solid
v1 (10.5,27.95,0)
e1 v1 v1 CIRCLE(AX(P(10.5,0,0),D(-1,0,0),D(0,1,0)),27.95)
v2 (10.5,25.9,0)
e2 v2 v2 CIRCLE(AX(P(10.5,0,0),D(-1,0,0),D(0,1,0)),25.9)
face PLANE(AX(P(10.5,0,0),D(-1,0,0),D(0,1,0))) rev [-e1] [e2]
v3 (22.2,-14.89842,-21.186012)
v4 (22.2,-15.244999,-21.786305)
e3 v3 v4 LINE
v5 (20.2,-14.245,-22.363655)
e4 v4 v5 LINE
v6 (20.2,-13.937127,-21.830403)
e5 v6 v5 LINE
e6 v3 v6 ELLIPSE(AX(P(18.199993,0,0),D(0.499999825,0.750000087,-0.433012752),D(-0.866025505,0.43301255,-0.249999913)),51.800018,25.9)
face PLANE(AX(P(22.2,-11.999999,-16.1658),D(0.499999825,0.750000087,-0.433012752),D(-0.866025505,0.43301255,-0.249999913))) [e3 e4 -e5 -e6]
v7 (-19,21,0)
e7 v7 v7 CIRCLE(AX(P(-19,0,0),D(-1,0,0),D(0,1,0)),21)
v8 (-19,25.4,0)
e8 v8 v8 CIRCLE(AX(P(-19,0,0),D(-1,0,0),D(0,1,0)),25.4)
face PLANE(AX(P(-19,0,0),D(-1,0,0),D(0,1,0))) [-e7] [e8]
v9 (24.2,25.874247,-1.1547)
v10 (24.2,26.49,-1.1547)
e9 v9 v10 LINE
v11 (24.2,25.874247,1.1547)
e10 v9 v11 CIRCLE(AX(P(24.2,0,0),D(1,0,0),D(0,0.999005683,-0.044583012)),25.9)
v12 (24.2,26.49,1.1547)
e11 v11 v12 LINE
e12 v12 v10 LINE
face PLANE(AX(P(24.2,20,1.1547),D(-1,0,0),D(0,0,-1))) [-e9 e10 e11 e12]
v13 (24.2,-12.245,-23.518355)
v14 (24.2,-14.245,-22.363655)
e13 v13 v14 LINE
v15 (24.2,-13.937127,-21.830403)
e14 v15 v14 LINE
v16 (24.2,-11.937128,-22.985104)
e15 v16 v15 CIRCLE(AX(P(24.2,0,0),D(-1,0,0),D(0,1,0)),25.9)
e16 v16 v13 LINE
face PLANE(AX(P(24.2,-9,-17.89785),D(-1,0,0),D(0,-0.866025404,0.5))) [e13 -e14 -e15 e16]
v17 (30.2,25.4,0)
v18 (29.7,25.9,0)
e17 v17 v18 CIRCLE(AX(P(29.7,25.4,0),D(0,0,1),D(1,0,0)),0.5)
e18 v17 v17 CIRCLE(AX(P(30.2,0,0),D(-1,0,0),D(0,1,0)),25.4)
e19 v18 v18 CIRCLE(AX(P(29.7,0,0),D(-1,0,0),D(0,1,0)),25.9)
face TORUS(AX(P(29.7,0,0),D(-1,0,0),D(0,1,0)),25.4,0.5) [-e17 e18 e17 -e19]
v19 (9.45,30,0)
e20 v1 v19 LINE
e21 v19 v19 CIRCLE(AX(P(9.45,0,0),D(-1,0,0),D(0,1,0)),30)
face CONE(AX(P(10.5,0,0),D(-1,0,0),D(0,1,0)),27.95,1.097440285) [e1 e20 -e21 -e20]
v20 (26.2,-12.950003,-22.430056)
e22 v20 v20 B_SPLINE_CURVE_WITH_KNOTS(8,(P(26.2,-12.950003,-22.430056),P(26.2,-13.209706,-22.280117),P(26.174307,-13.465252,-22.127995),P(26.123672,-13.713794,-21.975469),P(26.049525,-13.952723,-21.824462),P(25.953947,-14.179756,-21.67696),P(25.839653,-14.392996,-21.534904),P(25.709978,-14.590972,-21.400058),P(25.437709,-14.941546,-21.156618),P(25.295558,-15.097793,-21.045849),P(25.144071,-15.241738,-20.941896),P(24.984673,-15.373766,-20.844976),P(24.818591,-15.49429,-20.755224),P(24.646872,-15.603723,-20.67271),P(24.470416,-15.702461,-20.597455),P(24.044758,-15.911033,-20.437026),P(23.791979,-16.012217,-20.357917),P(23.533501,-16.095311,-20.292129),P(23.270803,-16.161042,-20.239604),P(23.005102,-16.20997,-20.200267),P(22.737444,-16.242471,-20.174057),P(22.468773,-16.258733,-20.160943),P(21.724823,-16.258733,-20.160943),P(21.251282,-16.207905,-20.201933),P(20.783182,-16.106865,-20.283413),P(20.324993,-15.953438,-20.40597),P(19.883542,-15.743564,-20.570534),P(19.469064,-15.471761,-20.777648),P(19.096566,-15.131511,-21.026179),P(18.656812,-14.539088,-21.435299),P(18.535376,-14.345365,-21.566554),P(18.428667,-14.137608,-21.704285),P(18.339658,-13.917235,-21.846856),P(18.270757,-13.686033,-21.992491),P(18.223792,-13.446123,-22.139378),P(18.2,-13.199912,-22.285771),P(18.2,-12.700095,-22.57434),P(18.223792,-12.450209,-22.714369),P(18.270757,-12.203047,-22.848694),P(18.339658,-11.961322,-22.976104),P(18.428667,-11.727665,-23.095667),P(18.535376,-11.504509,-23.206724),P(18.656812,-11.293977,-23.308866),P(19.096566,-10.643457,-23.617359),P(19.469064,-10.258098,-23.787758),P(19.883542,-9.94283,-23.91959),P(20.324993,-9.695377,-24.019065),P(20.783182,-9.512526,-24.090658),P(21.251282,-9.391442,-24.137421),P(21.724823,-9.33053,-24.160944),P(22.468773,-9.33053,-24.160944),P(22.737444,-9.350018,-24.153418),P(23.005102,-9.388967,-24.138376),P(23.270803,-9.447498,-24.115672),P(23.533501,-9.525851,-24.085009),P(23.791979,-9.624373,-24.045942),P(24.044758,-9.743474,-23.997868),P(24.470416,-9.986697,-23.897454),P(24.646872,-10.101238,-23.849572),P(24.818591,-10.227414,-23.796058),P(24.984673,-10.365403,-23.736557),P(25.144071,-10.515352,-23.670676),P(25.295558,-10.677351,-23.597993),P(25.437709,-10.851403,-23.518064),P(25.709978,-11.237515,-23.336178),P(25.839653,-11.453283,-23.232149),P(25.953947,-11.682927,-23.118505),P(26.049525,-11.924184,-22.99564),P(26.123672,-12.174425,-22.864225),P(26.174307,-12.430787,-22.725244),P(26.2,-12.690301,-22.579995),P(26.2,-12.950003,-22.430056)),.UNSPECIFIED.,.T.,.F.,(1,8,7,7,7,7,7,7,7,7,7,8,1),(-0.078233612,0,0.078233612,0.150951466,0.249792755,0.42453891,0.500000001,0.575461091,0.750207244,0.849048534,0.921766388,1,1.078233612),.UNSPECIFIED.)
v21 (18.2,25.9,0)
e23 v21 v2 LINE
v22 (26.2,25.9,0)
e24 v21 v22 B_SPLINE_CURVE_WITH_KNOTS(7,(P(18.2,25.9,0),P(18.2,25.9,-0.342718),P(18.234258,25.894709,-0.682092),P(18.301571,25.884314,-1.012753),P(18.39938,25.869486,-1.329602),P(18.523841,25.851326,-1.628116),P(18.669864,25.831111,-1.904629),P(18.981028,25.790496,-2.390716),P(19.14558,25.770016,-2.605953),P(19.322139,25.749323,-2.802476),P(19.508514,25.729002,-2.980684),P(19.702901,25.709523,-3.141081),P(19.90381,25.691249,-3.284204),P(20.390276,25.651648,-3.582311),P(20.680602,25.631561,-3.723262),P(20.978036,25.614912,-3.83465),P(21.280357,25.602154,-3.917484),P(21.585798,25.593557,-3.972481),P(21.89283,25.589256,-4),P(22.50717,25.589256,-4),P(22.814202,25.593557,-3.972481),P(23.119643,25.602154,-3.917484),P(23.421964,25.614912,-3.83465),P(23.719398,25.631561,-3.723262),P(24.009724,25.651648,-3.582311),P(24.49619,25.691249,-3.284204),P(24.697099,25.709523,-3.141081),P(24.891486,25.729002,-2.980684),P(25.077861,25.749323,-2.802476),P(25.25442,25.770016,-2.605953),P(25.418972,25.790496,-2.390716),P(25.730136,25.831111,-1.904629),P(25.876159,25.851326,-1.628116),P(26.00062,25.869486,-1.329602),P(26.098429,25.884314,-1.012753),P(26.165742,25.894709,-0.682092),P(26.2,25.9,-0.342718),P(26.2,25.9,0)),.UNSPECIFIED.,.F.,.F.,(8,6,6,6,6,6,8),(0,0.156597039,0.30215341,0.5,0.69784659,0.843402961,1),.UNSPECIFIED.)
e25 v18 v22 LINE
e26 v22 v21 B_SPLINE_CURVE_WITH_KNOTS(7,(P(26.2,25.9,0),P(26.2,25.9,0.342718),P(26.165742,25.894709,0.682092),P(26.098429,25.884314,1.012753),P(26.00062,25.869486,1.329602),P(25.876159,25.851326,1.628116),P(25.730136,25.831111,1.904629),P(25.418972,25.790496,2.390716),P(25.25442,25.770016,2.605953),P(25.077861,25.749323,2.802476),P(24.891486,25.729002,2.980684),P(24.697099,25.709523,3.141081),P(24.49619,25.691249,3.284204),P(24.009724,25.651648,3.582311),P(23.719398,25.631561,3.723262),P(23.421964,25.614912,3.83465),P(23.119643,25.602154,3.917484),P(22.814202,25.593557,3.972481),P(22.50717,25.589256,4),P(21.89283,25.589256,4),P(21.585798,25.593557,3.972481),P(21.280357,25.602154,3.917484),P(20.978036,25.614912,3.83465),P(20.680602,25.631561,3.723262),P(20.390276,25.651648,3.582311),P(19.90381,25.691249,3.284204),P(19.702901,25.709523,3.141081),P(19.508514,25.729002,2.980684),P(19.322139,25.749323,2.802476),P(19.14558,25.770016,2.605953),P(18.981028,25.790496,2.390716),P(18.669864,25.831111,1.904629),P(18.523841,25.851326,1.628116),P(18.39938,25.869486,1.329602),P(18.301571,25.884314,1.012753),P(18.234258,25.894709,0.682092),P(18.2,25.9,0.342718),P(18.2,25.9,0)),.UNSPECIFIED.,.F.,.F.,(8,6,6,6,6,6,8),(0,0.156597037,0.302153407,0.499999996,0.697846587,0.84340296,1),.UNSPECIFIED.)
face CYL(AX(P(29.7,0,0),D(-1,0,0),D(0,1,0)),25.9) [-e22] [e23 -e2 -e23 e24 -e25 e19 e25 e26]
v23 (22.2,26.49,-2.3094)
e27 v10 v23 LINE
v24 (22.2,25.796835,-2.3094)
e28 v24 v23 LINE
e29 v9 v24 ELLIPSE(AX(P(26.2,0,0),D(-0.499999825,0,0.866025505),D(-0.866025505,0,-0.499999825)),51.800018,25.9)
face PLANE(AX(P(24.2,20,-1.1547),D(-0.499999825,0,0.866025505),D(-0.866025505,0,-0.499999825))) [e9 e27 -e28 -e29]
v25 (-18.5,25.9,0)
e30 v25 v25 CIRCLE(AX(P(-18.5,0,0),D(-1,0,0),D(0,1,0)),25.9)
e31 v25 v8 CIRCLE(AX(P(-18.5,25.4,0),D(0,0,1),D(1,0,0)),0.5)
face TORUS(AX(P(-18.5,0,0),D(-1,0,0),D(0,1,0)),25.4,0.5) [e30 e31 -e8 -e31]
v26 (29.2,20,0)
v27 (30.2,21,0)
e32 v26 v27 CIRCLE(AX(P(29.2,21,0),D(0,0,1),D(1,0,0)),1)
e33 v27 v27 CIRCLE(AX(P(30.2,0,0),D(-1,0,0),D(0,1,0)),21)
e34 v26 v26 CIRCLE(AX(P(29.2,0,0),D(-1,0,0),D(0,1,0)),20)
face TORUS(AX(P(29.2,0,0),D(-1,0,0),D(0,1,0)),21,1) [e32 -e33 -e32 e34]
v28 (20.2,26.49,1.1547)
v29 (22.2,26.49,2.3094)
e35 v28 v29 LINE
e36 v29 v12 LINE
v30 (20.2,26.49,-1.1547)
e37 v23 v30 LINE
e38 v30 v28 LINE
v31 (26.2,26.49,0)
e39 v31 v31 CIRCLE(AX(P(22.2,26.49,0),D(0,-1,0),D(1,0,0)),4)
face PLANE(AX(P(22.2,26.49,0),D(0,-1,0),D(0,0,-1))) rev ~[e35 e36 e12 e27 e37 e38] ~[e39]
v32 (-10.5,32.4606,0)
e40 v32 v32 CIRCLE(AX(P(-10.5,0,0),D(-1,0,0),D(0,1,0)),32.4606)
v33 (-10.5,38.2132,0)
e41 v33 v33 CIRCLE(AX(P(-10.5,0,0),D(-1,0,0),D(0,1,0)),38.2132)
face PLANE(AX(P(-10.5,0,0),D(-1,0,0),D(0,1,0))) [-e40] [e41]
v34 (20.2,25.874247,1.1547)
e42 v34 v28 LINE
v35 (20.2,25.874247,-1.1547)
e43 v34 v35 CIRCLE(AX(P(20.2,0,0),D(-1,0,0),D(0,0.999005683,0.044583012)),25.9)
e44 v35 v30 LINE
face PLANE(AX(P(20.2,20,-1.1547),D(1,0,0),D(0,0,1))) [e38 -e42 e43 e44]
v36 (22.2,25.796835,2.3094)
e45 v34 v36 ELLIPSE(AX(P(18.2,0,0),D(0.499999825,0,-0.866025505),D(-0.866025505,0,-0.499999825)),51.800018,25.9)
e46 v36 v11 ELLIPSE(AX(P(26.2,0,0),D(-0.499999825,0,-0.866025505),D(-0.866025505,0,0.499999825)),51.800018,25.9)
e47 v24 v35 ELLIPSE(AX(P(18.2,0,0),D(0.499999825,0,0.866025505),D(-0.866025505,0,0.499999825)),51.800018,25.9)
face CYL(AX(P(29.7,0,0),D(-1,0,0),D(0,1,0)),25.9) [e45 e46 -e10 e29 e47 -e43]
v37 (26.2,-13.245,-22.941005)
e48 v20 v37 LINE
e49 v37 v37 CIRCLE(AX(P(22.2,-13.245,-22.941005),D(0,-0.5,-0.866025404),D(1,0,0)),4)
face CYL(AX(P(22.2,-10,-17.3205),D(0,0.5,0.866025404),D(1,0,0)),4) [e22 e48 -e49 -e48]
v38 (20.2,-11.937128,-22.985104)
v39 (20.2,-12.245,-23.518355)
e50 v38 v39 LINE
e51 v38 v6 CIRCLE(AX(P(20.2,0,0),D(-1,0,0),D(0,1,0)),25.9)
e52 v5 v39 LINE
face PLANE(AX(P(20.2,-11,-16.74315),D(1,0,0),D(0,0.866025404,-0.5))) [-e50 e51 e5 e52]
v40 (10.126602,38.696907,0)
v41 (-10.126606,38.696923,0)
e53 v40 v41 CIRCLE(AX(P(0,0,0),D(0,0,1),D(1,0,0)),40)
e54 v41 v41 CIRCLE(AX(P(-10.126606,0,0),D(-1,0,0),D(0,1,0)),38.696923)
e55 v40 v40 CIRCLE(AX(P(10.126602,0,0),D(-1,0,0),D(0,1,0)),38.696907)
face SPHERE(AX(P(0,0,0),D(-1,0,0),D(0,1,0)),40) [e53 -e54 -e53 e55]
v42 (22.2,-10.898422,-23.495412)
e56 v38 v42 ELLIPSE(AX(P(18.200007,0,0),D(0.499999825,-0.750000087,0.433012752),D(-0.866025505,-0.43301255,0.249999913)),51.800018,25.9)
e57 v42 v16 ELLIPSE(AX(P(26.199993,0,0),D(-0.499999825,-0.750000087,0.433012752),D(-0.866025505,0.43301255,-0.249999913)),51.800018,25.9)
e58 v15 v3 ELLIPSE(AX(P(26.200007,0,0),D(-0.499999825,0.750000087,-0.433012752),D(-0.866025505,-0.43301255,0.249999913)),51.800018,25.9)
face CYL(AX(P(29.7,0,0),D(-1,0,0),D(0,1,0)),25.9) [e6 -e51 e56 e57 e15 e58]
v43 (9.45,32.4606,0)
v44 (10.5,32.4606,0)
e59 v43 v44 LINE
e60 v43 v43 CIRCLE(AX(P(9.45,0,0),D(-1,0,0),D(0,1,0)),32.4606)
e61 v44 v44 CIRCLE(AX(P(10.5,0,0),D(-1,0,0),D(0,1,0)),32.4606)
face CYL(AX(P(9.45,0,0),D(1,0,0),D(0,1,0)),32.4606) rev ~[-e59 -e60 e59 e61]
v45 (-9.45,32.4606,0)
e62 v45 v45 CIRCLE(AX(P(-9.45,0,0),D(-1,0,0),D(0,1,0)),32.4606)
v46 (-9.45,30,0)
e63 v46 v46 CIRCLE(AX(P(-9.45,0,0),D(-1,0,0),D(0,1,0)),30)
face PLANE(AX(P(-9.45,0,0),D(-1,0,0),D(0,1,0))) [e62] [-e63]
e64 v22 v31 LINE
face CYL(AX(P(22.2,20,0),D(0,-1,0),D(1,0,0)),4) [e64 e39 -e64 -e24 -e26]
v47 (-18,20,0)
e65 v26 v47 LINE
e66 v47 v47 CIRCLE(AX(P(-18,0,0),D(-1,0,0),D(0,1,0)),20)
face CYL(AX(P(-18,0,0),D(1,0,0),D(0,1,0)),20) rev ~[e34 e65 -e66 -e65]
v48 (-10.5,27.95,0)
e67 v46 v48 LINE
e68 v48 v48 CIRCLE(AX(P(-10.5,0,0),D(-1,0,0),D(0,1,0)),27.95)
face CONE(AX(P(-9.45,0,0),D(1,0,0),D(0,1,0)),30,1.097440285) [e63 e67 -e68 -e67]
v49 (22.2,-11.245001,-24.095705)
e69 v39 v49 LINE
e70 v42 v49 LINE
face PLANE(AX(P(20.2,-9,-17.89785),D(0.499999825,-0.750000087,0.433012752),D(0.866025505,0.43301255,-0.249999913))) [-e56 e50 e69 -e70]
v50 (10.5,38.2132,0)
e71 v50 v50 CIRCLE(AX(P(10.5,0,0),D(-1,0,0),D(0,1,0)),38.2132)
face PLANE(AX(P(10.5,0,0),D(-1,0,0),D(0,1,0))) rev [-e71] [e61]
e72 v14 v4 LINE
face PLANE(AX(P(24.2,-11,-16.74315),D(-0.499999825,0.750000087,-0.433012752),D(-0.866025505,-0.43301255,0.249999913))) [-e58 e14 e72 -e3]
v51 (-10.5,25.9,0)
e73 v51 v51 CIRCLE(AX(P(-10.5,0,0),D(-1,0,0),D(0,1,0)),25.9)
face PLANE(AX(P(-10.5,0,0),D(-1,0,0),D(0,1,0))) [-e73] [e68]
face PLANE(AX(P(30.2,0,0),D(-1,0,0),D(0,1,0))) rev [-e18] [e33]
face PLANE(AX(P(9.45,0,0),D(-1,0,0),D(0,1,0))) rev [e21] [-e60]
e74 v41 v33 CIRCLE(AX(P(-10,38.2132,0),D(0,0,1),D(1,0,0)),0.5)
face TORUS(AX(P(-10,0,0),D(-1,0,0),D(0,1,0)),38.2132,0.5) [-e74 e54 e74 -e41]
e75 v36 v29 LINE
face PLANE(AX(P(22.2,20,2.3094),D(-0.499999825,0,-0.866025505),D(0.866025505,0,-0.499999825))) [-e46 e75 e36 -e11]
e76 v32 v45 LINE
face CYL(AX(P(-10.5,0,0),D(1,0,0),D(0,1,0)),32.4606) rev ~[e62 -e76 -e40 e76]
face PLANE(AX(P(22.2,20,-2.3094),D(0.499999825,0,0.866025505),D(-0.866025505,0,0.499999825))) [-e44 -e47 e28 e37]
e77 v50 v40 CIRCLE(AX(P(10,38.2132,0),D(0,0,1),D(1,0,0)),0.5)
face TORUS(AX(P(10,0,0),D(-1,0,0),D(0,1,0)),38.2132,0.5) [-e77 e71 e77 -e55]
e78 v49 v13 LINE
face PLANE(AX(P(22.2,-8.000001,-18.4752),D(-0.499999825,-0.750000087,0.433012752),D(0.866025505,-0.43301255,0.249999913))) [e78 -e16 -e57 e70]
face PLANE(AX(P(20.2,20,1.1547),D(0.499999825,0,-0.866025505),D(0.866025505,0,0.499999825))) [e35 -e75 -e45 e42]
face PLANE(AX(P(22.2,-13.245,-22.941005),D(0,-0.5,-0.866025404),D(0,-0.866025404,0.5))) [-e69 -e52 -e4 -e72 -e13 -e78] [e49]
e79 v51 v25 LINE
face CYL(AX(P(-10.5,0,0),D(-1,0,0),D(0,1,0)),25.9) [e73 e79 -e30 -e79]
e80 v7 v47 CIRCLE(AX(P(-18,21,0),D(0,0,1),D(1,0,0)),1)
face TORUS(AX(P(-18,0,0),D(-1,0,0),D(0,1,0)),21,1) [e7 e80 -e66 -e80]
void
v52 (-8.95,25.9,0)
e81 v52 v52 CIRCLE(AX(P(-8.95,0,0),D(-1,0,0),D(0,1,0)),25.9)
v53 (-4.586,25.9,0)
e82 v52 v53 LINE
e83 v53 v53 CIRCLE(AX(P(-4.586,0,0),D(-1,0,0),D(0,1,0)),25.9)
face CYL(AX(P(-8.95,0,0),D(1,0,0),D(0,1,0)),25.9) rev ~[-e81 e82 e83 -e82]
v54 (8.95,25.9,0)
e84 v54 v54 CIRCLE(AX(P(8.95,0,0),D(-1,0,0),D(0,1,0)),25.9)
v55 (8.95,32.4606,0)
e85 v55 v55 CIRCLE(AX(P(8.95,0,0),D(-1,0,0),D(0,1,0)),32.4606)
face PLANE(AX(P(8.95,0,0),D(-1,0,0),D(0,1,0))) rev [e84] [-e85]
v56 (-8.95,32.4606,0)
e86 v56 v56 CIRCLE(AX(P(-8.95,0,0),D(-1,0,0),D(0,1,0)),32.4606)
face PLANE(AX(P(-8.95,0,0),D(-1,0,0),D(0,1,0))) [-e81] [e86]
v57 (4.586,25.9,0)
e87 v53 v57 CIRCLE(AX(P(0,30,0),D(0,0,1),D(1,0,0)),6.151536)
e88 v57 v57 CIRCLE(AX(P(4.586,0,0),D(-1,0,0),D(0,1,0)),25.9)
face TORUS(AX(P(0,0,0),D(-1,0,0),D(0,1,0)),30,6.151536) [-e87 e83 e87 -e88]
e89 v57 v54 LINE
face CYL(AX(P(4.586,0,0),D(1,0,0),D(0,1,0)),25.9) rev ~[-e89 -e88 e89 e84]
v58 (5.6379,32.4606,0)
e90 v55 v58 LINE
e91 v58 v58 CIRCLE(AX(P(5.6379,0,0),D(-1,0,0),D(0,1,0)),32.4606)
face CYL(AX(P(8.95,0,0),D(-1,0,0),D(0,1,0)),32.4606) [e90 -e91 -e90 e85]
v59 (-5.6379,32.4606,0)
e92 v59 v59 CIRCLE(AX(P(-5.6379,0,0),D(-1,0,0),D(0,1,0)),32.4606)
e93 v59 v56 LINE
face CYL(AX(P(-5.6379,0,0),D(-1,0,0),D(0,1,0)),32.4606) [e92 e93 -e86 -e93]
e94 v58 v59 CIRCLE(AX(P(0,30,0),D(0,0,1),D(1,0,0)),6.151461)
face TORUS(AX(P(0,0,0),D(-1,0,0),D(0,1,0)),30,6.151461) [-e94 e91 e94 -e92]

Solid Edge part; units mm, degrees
sketch "Sketch1" plane through (0, 20, 0) normal (0, -1, 0) x (1, 0, 0)
  circle A0 centre (22.2, 0) radius 4
  line L0 (20.2, -1.1547) -> (20.2, 1.1547)
  line L1 (20.2, 1.1547) -> (22.2, 2.3094)
  line L2 (22.2, 2.3094) -> (24.2, 1.1547)
  line L3 (24.2, 1.1547) -> (24.2, -1.1547)
  line L4 (24.2, -1.1547) -> (22.2, -2.3094)
  line L5 (22.2, -2.3094) -> (20.2, -1.1547)
extrude "ExtrudedProtrusion_1" add sketch "Sketch1" against normal blind 6.49
sketch "Sketch2" plane through (0, 0, 0) normal (0, 0, 1) x (1, 0, 0)
  arc A0 (-19, 21) -> (-18, 20) centre (-18, 21) ccw
  line L0 (-18, 20) -> (29.2, 20)
  arc A1 (29.2, 20) -> (30.2, 21) centre (29.2, 21) ccw
  line L1 (30.2, 21) -> (30.2, 25.4)
  arc A2 (30.2, 25.4) -> (29.7, 25.9) centre (29.7, 25.4) ccw
  line L2 (29.7, 25.9) -> (10.5, 25.9)
  line L3 (10.5, 25.9) -> (10.5, 27.95)
  line L4 (10.5, 27.95) -> (9.45, 30)
  line L5 (9.45, 30) -> (9.45, 32.4606)
  line L6 (9.45, 32.4606) -> (10.5, 32.4606)
  line L7 (10.5, 32.4606) -> (10.5, 38.2132)
  arc A3 (10.5, 38.2132) -> (10.1266, 38.6969) centre (10, 38.2132) ccw
  arc A4 (10.1266, 38.6969) -> (-10.1266, 38.6969) centre (0, 0) ccw
  arc A5 (-10.1266, 38.6969) -> (-10.5, 38.2132) centre (-10, 38.2132) ccw
  line L8 (-10.5, 38.2132) -> (-10.5, 32.4606)
  line L9 (-10.5, 32.4606) -> (-9.45, 32.4606)
  line L10 (-9.45, 32.4606) -> (-9.45, 30)
  line L11 (-9.45, 30) -> (-10.5, 27.95)
  line L12 (-10.5, 27.95) -> (-10.5, 25.9)
  line L13 (-10.5, 25.9) -> (-18.5, 25.9)
  arc A6 (-18.5, 25.9) -> (-19, 25.4) centre (-18.5, 25.4) ccw
  line L14 (-19, 25.4) -> (-19, 21)
  line L15 (-8.95, 32.4606) -> (-8.95, 25.9)
  line L16 (-8.95, 25.9) -> (-4.586, 25.9)
  arc A7 (-4.586, 25.9) -> (4.586, 25.9) centre (0, 30) ccw
  line L17 (4.586, 25.9) -> (8.95, 25.9)
  line L18 (8.95, 25.9) -> (8.95, 32.4606)
  line L19 (8.95, 32.4606) -> (5.6379, 32.4606)
  arc A8 (5.6379, 32.4606) -> (-5.6379, 32.4606) centre (0, 30) ccw
  line L20 (-5.6379, 32.4606) -> (-8.95, 32.4606)
revolve "RevolvedProtrusion1" add sketch "Sketch2" angle 360 about axis through (50, 0, 0) along (-1, 0, 0)
sketch "Sketch3" plane through (0, -10, -17.3205) normal (0, -0.5, -0.8660254) x (1, 0, 0)
  circle A0 centre (22.2, 0) radius 4
  line L0 (20.2, 1.1547) -> (20.2, -1.1547)
  line L1 (20.2, -1.1547) -> (22.2, -2.3094)
  line L2 (22.2, -2.3094) -> (24.2, -1.1547)
  line L3 (24.2, -1.1547) -> (24.2, 1.1547)
  line L4 (24.2, 1.1547) -> (22.2, 2.3094)
  line L5 (22.2, 2.3094) -> (20.2, 1.1547)
extrude "ExtrudedProtrusion_2" add sketch "Sketch3" along normal blind 6.49
properties material "Stainless steel"
